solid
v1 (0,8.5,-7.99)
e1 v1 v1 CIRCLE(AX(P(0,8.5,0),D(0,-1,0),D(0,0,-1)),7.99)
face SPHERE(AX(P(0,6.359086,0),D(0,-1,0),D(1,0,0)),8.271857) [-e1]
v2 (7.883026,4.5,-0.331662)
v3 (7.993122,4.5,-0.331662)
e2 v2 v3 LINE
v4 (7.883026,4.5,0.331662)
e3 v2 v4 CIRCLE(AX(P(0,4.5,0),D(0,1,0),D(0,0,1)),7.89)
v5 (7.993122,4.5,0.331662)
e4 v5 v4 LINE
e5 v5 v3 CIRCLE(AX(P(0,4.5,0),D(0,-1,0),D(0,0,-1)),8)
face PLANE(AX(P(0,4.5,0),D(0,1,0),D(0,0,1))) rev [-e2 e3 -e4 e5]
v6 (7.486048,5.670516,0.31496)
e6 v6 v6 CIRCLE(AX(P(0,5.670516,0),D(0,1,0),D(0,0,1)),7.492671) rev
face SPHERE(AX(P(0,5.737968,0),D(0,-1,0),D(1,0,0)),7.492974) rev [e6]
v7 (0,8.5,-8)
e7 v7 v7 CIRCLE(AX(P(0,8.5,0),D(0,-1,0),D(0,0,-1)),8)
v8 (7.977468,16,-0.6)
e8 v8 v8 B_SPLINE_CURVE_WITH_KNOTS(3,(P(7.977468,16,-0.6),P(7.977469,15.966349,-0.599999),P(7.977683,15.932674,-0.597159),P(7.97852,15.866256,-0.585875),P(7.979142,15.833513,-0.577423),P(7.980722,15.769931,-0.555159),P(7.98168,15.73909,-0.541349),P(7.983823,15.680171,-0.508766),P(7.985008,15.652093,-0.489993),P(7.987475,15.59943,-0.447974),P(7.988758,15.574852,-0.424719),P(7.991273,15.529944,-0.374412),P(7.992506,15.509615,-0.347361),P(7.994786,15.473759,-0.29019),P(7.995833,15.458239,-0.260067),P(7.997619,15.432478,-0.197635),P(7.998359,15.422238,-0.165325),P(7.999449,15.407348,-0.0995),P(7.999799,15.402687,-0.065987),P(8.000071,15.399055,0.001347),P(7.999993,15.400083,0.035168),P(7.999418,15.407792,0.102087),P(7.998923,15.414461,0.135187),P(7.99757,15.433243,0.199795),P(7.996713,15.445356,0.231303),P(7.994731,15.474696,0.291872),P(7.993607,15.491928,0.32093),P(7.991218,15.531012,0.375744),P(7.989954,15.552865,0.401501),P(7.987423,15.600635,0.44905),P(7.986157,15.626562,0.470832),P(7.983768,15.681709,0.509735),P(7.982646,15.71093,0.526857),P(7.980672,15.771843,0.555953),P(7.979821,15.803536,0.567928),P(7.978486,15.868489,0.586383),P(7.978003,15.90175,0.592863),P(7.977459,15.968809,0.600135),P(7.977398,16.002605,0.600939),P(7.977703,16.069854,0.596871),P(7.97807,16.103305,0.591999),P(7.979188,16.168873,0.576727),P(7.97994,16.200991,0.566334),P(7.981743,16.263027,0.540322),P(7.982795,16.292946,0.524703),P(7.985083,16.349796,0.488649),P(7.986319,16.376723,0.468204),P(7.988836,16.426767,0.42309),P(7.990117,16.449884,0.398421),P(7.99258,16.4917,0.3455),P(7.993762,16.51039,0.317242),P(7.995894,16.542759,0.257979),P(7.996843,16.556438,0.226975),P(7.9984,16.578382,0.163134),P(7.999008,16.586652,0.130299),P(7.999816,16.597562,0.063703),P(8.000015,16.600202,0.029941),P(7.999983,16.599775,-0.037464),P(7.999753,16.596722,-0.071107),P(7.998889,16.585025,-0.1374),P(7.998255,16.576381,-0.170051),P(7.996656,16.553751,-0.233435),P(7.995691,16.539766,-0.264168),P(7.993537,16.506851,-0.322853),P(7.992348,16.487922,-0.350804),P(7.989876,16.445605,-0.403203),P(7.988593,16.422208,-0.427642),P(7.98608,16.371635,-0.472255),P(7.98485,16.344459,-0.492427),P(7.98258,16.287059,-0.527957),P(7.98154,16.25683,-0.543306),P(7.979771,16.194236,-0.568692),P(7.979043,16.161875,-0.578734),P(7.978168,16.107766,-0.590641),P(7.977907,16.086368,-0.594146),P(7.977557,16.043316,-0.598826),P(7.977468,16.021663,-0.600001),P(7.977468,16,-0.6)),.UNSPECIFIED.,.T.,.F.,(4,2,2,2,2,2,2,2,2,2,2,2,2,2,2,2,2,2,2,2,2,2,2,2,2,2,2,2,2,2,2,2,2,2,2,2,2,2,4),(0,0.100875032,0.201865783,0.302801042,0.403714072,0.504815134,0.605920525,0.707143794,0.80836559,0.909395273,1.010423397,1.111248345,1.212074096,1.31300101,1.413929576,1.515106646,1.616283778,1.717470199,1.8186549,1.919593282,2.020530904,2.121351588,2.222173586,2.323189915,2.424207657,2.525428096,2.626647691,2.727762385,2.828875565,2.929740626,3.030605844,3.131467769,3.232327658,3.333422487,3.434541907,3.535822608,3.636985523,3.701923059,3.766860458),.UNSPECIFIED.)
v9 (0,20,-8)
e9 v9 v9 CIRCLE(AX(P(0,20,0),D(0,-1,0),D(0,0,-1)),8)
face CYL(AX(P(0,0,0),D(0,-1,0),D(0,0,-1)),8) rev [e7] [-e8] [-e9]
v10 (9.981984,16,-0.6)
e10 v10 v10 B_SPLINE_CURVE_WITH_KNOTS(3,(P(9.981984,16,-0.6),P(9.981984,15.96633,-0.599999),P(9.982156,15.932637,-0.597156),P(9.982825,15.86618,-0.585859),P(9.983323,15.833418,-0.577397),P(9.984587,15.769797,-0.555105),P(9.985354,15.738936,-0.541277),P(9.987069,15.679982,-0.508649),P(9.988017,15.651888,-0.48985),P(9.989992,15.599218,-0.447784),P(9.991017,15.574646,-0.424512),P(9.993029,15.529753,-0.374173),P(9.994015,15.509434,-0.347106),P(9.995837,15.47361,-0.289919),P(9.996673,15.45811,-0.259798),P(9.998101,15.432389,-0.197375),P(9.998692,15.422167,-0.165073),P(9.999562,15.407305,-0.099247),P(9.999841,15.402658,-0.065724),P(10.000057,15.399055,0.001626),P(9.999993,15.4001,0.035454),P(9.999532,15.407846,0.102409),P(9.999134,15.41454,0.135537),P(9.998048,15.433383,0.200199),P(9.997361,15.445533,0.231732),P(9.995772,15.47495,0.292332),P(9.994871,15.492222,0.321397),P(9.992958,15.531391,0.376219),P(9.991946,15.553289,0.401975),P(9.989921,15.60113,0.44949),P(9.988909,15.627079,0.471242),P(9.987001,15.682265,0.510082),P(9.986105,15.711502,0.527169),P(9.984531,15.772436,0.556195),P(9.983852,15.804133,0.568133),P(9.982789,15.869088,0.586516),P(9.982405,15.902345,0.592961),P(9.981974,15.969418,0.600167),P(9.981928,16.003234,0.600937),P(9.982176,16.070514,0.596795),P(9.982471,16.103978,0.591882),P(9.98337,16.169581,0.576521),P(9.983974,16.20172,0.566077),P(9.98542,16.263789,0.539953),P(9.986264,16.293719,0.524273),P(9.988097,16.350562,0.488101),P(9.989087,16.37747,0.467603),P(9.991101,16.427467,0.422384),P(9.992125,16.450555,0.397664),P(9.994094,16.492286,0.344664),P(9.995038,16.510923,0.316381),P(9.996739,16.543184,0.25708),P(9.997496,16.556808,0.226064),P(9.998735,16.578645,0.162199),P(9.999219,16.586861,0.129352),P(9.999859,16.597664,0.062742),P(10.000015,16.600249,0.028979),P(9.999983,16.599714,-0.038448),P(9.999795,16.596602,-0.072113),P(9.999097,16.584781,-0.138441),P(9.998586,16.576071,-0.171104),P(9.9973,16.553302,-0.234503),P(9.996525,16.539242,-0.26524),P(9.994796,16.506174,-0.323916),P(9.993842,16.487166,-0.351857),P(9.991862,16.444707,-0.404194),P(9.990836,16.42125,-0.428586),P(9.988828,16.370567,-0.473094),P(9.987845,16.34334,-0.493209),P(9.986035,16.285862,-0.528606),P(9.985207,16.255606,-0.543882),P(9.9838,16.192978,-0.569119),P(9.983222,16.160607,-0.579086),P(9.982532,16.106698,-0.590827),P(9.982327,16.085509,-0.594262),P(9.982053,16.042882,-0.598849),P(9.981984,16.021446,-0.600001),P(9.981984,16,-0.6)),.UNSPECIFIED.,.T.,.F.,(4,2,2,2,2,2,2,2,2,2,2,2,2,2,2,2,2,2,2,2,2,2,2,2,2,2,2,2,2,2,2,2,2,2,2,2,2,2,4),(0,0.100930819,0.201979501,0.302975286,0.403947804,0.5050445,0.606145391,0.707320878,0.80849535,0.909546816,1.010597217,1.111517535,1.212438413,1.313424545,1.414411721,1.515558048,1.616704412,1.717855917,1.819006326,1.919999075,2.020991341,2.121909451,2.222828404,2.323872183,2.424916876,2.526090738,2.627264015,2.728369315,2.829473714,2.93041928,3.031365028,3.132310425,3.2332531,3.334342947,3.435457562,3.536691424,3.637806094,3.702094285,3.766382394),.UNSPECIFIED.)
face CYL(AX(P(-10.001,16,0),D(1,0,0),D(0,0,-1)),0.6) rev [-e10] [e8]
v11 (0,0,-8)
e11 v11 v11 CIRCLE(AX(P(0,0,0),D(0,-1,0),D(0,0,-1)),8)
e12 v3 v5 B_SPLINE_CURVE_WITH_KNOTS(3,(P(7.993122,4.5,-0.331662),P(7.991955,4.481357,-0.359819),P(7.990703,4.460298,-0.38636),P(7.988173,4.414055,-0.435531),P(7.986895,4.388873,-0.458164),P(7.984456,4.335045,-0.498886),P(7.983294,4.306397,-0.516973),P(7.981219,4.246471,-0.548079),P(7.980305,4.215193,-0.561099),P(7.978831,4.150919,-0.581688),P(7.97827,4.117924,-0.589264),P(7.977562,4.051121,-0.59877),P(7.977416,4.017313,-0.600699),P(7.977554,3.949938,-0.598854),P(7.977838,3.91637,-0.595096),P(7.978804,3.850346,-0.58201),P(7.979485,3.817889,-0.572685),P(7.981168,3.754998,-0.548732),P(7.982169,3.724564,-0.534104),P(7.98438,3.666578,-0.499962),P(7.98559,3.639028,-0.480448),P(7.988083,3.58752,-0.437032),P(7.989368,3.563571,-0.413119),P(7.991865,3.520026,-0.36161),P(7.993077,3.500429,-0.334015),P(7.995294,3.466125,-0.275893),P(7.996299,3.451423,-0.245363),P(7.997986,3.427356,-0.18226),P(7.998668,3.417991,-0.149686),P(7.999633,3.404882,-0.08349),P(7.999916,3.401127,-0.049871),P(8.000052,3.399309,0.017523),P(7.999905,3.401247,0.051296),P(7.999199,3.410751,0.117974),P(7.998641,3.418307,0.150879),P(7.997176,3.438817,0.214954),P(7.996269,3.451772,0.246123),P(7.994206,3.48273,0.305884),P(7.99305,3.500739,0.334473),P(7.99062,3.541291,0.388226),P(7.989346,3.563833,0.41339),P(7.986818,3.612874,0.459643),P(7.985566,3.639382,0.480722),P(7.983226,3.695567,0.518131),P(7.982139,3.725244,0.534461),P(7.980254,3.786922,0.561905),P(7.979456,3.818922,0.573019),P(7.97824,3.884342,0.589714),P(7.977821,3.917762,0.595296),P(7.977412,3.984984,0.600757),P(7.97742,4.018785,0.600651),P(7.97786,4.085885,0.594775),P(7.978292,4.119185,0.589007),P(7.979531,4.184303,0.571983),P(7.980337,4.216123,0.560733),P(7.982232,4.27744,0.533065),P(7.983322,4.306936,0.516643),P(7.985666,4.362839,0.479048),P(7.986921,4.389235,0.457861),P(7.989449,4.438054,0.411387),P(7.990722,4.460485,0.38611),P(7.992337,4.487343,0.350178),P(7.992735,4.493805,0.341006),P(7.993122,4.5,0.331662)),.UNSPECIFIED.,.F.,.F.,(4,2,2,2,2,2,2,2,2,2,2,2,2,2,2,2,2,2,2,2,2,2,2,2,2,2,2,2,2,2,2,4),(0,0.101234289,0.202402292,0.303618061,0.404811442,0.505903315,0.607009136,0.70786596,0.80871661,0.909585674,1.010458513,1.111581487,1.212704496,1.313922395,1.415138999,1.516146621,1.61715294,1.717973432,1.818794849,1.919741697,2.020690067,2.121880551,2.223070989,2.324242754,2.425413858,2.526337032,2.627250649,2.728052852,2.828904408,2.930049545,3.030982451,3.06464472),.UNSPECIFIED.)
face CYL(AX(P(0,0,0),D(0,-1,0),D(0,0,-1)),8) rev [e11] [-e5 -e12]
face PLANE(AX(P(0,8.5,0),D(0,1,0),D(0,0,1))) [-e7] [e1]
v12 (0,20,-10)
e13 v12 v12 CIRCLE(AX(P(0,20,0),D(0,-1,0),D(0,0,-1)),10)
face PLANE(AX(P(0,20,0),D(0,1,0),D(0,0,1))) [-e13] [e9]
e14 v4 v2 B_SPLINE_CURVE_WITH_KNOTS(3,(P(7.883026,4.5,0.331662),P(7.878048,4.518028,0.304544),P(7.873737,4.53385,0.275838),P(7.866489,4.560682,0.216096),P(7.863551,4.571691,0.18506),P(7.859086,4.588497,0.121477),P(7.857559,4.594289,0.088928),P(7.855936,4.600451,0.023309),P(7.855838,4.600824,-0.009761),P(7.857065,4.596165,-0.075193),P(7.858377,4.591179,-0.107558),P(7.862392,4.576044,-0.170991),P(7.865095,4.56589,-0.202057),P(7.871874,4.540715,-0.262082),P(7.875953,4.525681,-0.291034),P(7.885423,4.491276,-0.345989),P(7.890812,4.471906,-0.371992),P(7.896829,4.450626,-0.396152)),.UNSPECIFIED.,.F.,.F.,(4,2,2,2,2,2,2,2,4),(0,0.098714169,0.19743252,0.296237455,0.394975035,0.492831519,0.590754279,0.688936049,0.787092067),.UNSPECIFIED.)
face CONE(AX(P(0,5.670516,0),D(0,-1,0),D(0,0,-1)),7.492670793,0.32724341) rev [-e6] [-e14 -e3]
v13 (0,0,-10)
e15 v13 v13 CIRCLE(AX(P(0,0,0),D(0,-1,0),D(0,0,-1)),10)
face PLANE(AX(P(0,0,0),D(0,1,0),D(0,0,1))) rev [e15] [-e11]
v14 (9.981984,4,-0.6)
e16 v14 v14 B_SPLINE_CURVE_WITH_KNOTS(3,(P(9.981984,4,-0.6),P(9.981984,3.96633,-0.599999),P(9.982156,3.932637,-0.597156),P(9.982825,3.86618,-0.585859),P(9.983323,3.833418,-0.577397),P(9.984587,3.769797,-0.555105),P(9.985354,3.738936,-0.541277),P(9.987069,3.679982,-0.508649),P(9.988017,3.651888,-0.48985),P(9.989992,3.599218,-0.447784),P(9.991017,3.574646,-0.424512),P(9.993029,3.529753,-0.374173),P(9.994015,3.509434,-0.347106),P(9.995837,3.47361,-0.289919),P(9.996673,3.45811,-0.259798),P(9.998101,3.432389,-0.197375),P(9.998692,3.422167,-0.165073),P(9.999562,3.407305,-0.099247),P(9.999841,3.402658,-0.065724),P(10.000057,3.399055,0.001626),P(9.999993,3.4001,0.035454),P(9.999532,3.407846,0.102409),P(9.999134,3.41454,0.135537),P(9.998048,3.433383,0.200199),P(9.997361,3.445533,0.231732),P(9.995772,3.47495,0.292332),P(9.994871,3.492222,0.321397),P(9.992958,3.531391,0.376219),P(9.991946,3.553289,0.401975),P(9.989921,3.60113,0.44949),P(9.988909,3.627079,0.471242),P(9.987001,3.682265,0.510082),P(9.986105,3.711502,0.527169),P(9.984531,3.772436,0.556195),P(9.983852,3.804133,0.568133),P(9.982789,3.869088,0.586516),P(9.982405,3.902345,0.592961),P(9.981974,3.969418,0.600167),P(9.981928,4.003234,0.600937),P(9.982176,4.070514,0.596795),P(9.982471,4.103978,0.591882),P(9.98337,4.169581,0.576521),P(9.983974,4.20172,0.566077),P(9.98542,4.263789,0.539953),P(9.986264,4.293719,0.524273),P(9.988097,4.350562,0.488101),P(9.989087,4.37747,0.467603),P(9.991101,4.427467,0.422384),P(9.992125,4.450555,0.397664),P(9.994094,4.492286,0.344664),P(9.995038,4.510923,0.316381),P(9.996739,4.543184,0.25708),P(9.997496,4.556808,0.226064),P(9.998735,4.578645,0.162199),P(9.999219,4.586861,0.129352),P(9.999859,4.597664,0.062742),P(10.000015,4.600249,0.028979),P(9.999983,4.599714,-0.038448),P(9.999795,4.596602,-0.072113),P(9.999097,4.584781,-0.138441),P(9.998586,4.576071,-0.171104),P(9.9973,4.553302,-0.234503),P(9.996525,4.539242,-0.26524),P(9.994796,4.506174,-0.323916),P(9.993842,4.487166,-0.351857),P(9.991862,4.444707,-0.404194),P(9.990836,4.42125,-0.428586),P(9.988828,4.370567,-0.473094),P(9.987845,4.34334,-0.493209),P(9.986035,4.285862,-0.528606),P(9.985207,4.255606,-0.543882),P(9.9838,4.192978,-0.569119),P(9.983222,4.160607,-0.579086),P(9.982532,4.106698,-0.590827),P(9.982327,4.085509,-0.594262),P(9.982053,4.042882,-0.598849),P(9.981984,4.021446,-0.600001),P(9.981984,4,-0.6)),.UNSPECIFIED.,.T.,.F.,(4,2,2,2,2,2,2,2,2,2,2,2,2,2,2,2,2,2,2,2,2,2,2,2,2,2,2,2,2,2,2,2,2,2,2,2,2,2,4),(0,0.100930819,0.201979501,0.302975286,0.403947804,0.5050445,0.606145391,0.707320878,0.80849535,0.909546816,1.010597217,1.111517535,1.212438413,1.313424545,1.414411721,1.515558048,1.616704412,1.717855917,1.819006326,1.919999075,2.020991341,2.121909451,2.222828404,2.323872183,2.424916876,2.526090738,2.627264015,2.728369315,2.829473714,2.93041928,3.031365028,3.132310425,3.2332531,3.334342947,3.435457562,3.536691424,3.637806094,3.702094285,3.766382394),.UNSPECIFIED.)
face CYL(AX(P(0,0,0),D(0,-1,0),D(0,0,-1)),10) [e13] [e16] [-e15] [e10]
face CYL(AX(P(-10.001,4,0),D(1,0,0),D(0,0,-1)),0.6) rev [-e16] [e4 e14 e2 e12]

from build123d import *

# Parameters (mm, degrees)
SKETCH1_W          = 0.01
SKETCH1_H          = 4
SKETCH1_W_2        = 2
SKETCH1_H_2        = 20
CUT_EXTRUDE1_REACH = 32
SKETCH2_R          = 0.6
CHAMFER1_SIZE      = 0.5


with BuildPart() as part:
    # Sketch1 → Revolve1 (revolve)
    with BuildSketch(Plane.XY, mode=Mode.PRIVATE) as revolve1_sk:
        with BuildLine():
            Line((0, 14.630942634), (0, 13.230942634))
            ThreePointArc((0, 13.230942634), (5.719297581, 10.578866966), (7.39, 4.5))
            Line((7.39, 4.5), (7.99, 4.5))
            Line((7.99, 4.5), (7.99, 8.5))
            ThreePointArc((7.99, 8.5), (5.035587294, 12.921591081), (0, 14.630942634))
        make_face()
        with Locations((7.995, 6.5)):
            Rectangle(SKETCH1_W, SKETCH1_H)
        with Locations((9, 10)):
            Rectangle(SKETCH1_W_2, SKETCH1_H_2)
    revolve(revolve1_sk.sketch.rotate(Axis((0, 0, 0), (0, 1, 0)), 90), axis=Axis((0, 0, 0), (0, 1, 0)))

    # Sketch2 → Cut-Extrude1 (cut, up to next)
    with BuildSketch(Plane(origin=(10, 0, 0), x_dir=(0, 0, -1), z_dir=(1, 0, 0)), mode=Mode.PRIVATE) as cut_extrude1_sk1:
        with Locations((0, 16)):
            Circle(SKETCH2_R)
    cut_extrude1_tool1 = extrude(cut_extrude1_sk1.sketch, amount=-CUT_EXTRUDE1_REACH, mode=Mode.PRIVATE) & part.part
    # Sketch2 → Cut-Extrude1 (cut, up to next)
    with BuildSketch(Plane(origin=(10, 0, 0), x_dir=(0, 0, -1), z_dir=(1, 0, 0)), mode=Mode.PRIVATE) as cut_extrude1_sk2:
        with Locations((0, 4)):
            Circle(SKETCH2_R)
    cut_extrude1_tool2 = extrude(cut_extrude1_sk2.sketch, amount=-CUT_EXTRUDE1_REACH, mode=Mode.PRIVATE) & part.part
    add(cut_extrude1_tool1.solids().sort_by_distance((10, 16, 0))[0], mode=Mode.SUBTRACT)
    add(cut_extrude1_tool2.solids().sort_by_distance((10, 4, 0))[0], mode=Mode.SUBTRACT)

    # Chamfer1
    # the kernel refuses this chamfer: 1, 0.5 mm, written as the material it takes off along each edge
    with BuildSketch(Plane(origin=(0, 4.5, 0), x_dir=(0, 0, -1), z_dir=(1, 0, 0))) as chamfer1_piece_1:
        with BuildLine():
            Line((7.39 + CHAMFER1_SIZE, 0), (7.492670793, 1.1705165))
            ThreePointArc((7.492670793, 1.1705165), (7.465898714, 0.601555049), (7.39, 0))
            Line((7.39, 0), (7.39 + CHAMFER1_SIZE, 0))
        make_face()
    revolve(axis=Axis((0, 4.5, 0), (0, 1, 0)), revolution_arc=290.997944541, mode=Mode.SUBTRACT)
    with BuildSketch(Plane(origin=(0, 4.5, 0), x_dir=(0.9340589469331272, 0, 0.3571188648813968), z_dir=(-0.3571188648813968, 0, 0.9340589469331272))) as chamfer1_piece_2:
        with BuildLine():
            Line((7.39 + CHAMFER1_SIZE, 0), (7.492670793, 1.1705165))
            ThreePointArc((7.492670793, 1.1705165), (7.465898714, 0.601555049), (7.39, 0))
            Line((7.39, 0), (7.39 + CHAMFER1_SIZE, 0))
        make_face()
    revolve(axis=Axis((0, 4.5, 0), (0, 1, 0)), revolution_arc=110.92336072, mode=Mode.SUBTRACT)


solid = part.part
